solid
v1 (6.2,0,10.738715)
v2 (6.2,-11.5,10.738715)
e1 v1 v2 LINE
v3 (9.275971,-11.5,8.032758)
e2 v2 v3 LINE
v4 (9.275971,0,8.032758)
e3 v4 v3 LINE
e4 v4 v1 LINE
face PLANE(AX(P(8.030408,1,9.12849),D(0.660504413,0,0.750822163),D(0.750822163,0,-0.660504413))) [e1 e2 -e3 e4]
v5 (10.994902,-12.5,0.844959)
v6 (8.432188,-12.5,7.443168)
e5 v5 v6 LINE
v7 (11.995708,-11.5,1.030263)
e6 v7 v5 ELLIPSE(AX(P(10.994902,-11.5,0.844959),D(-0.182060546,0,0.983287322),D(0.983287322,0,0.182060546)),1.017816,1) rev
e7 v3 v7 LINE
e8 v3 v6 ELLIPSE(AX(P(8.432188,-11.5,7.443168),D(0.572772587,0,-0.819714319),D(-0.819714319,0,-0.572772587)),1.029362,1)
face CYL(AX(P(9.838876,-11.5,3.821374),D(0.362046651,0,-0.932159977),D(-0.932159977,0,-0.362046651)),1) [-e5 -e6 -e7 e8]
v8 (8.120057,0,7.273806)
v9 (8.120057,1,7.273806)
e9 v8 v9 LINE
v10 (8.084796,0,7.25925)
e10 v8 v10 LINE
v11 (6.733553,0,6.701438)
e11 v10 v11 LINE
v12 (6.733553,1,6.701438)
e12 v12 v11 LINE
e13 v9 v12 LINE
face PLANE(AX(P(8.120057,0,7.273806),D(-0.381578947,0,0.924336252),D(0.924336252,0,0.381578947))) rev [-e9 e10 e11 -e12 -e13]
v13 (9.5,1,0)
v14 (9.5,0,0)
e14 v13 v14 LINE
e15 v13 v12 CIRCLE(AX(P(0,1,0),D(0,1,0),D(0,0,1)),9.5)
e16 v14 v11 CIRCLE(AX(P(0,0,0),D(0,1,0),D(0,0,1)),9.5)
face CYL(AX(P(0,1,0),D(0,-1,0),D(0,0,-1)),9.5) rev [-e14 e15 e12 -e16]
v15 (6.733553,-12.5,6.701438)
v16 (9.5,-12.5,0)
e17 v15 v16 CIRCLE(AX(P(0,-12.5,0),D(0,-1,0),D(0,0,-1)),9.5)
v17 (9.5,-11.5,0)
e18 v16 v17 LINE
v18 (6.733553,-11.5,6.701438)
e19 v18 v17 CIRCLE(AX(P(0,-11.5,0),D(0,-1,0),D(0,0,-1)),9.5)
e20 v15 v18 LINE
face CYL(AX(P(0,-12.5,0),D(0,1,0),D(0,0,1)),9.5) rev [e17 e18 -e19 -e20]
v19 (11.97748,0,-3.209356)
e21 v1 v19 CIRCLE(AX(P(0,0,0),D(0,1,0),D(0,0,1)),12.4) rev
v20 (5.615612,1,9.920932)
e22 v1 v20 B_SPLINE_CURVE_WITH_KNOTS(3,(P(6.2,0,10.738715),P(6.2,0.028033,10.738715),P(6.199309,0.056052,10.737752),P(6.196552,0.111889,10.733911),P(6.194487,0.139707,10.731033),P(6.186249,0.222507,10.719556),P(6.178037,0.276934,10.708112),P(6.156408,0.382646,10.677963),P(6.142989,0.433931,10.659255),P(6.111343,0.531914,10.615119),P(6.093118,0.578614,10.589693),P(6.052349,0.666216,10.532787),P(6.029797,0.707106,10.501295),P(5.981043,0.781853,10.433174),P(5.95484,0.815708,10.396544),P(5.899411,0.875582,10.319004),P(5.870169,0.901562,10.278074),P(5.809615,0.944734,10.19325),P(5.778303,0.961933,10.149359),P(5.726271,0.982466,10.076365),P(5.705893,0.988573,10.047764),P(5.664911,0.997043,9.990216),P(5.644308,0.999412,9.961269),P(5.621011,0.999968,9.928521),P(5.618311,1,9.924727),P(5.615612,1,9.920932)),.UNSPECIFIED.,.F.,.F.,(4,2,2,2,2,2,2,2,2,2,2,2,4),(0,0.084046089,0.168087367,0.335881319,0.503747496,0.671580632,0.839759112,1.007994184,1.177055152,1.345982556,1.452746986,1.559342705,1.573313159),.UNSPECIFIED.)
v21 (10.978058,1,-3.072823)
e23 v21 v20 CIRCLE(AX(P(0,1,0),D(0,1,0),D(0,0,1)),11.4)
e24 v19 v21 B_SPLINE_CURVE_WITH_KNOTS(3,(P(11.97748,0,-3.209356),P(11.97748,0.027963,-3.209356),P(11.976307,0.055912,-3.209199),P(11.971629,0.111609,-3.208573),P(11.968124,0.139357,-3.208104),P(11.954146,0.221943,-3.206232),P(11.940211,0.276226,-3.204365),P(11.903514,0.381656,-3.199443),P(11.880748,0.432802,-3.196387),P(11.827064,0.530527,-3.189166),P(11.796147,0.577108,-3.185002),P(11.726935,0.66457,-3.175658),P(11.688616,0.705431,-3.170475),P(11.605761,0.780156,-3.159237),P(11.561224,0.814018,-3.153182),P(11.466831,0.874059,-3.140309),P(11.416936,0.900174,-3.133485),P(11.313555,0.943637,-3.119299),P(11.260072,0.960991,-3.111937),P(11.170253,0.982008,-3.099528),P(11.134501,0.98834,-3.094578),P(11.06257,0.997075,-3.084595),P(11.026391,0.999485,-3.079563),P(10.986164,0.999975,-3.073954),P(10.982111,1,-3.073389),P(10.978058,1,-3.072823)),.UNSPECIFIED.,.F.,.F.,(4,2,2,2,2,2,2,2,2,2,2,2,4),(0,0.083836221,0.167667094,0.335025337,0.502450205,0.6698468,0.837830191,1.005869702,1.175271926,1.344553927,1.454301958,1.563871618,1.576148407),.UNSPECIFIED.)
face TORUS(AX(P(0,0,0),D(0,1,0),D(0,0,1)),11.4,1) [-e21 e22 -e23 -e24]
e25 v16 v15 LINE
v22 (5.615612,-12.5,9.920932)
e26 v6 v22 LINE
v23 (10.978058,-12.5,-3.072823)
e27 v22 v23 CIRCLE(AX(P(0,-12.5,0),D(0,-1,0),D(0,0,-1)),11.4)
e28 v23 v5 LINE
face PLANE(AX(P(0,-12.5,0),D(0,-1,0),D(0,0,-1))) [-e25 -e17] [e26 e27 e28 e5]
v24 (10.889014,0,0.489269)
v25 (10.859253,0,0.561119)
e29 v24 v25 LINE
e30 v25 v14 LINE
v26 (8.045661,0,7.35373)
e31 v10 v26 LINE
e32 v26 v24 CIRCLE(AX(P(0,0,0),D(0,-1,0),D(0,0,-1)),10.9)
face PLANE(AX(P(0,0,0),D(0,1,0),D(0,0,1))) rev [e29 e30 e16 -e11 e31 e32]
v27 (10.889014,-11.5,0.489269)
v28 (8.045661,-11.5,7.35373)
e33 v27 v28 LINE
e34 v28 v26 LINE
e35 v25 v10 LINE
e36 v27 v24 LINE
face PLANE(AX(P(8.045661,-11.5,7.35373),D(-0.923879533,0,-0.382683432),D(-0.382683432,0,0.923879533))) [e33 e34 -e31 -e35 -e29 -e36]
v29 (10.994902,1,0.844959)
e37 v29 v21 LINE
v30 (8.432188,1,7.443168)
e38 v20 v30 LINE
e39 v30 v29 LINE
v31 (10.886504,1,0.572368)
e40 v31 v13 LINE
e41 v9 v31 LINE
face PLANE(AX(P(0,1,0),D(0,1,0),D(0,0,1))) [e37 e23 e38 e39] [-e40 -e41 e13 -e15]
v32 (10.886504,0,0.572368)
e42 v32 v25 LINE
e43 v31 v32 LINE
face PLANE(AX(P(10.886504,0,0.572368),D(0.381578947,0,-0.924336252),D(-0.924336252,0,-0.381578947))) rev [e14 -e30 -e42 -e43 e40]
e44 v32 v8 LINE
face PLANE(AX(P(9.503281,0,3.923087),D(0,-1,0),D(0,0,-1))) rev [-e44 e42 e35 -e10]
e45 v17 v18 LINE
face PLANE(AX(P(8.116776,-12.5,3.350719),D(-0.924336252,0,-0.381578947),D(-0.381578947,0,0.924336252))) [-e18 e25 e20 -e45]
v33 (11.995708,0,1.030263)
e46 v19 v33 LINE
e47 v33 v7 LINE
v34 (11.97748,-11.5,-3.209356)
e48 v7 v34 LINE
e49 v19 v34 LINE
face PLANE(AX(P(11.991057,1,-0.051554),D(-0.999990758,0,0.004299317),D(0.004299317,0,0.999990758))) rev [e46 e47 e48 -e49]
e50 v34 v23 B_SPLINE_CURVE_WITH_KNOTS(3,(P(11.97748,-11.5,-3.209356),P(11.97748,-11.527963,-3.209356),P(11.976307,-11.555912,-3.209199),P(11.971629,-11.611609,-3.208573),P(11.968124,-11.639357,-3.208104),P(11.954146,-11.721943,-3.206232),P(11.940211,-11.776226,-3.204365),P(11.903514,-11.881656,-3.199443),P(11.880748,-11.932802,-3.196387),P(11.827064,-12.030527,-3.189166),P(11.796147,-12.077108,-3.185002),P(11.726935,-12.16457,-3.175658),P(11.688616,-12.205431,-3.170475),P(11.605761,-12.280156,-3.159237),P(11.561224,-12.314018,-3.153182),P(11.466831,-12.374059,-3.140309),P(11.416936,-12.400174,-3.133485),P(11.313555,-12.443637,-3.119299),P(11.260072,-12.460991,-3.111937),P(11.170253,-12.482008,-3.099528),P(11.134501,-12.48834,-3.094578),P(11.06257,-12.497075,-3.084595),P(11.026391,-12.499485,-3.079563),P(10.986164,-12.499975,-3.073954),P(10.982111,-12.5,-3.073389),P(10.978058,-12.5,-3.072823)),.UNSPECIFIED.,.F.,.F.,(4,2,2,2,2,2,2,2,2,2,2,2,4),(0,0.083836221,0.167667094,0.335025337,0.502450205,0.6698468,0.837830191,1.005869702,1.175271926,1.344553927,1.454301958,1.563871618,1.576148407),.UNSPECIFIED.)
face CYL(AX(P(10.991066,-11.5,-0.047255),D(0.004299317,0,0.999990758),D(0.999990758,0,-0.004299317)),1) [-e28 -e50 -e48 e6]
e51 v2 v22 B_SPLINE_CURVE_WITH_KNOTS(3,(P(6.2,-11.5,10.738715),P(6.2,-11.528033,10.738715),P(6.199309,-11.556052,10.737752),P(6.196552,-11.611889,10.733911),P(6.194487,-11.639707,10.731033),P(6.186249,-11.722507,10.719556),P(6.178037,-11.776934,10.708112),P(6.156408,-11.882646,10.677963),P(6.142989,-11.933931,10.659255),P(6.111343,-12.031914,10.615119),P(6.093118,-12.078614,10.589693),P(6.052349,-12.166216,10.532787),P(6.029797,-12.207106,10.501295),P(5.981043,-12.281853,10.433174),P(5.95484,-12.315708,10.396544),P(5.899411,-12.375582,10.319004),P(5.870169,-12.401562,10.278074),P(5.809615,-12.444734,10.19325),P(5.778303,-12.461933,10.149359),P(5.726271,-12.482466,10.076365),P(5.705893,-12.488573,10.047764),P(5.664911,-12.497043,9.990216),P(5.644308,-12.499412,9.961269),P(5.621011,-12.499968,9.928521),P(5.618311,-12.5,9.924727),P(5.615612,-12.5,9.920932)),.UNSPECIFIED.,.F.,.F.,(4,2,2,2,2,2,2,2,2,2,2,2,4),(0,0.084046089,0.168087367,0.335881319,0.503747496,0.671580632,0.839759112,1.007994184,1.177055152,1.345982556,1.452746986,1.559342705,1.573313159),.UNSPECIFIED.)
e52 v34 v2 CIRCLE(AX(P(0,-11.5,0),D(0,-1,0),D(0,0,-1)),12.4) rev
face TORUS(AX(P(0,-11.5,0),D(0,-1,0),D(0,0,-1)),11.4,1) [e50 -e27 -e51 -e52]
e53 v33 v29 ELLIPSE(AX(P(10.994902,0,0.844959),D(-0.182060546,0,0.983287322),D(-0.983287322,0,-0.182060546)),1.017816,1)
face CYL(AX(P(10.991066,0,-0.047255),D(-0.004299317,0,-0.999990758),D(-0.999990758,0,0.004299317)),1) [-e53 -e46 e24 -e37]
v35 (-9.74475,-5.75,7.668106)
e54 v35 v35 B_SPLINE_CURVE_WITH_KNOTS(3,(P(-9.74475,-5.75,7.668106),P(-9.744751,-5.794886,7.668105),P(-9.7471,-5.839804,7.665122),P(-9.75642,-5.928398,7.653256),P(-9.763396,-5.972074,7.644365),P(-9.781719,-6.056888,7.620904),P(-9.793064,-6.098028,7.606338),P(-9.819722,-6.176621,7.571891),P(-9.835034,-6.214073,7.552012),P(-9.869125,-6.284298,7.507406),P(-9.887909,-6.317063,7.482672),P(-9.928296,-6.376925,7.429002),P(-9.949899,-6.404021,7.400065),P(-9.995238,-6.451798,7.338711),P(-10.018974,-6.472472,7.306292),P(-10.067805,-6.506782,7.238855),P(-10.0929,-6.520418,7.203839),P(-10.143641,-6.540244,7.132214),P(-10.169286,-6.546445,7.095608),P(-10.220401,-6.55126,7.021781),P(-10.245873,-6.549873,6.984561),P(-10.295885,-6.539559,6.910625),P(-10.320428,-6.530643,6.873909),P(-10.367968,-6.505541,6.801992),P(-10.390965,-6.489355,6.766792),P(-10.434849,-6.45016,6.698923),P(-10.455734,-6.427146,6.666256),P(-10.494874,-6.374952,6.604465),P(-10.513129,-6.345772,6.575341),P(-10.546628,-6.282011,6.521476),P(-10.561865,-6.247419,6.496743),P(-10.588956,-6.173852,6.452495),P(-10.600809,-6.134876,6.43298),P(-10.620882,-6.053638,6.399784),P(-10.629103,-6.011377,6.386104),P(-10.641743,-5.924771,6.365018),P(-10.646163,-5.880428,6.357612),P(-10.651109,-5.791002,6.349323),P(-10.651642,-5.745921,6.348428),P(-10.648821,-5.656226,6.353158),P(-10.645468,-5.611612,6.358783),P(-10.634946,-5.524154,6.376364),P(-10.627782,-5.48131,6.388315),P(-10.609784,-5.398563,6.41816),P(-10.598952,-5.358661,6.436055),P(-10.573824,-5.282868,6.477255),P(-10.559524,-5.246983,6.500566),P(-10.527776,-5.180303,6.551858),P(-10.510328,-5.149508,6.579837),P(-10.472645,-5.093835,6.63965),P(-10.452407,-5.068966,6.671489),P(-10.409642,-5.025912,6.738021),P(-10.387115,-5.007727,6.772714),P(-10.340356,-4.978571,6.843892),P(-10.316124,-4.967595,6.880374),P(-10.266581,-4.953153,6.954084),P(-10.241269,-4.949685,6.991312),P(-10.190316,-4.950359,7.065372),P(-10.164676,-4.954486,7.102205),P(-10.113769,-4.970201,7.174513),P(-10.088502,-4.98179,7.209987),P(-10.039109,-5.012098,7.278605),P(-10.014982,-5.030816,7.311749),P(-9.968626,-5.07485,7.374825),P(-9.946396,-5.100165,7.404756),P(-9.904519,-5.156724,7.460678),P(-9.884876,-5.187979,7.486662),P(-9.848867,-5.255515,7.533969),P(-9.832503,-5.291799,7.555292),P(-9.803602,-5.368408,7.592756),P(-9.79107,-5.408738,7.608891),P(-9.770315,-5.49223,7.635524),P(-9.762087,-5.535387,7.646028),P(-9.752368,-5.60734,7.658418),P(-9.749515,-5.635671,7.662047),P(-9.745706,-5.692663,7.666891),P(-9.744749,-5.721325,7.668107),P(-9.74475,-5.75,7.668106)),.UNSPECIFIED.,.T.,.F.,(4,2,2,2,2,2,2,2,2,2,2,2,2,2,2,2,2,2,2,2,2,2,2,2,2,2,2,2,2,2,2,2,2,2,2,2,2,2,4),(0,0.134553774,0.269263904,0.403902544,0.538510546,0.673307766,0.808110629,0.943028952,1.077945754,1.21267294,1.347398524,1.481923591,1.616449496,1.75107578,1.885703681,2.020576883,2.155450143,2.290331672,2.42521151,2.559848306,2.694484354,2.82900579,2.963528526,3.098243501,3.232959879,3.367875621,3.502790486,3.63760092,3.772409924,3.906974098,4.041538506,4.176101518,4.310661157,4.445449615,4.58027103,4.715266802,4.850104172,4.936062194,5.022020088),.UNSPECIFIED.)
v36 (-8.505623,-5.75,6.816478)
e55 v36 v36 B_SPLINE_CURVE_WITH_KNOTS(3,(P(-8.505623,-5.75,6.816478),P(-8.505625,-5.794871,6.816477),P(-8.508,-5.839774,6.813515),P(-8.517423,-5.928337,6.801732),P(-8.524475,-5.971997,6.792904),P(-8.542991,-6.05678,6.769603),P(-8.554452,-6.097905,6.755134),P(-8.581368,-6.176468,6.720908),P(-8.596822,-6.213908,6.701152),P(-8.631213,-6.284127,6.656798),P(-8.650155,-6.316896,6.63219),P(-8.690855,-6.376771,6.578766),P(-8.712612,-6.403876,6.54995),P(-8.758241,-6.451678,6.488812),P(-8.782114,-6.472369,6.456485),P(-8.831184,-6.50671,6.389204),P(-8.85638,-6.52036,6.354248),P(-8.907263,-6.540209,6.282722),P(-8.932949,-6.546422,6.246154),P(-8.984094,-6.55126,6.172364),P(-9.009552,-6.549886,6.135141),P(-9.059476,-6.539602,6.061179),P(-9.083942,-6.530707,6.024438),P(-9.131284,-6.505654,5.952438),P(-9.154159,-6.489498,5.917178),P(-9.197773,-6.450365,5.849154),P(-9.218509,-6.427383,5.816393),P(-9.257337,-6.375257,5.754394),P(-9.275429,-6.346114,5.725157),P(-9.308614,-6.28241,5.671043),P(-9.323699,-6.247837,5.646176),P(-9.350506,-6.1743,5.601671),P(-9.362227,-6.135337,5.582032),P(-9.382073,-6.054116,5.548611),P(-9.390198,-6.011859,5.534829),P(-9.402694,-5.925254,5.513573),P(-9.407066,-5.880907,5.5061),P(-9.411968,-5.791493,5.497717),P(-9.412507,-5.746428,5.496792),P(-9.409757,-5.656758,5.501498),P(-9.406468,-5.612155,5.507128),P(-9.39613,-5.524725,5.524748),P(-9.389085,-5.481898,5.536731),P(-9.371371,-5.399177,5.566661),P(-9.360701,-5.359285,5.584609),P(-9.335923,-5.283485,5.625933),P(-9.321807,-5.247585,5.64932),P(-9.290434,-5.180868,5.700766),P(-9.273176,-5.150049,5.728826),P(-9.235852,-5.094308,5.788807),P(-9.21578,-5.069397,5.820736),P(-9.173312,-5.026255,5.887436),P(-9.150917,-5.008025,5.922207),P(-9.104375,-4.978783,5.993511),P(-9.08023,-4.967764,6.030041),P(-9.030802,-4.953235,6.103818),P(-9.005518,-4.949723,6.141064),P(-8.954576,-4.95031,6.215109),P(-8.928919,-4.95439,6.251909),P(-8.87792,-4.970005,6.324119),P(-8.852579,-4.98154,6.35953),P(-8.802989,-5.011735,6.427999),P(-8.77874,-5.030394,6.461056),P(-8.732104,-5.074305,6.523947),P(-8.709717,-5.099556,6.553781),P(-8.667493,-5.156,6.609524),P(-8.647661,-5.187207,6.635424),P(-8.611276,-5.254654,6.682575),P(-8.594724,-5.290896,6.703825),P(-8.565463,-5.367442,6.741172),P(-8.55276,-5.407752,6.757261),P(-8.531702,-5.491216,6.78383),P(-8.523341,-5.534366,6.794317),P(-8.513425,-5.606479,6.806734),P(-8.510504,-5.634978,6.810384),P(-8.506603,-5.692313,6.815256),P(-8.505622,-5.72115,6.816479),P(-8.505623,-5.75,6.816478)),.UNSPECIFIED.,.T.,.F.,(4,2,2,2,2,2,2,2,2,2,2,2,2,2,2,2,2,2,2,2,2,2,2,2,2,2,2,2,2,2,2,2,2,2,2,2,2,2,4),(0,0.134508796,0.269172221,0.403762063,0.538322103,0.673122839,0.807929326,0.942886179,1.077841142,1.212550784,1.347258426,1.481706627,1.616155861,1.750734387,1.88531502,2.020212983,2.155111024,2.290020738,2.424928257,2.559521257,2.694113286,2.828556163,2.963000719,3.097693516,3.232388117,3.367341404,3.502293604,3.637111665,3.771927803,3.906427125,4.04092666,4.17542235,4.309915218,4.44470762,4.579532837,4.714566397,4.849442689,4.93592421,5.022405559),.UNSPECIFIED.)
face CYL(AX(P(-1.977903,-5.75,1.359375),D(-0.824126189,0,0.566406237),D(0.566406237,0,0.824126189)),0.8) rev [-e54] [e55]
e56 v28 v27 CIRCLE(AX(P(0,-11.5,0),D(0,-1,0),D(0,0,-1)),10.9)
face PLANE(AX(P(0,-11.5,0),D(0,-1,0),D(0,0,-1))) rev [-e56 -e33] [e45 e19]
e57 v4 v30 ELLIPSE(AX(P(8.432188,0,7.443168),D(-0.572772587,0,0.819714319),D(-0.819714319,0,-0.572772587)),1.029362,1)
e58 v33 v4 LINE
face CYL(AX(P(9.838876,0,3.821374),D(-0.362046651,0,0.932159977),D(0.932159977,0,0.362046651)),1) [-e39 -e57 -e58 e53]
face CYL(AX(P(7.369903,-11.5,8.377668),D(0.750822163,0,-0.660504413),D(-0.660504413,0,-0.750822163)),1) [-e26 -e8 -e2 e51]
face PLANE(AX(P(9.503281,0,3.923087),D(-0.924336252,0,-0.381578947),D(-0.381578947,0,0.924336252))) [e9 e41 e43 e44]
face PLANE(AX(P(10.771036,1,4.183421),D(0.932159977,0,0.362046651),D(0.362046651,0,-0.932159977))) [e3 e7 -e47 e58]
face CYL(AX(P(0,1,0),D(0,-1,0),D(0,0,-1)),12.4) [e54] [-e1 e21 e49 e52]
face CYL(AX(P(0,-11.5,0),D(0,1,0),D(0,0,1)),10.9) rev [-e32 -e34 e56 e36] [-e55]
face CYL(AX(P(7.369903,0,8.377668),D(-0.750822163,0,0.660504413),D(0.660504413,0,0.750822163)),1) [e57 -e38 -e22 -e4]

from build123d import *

# Parameters (mm, degrees)
EXTRUDE_1_DEPTH     = 1
EXTRUDE_START       = 11.5
EXTRUDE_3_DEPTH     = 11.5
EXTRUDE_START_2     = 1
EXTRUDE_4_DEPTH     = 1
FILLET_1_R          = 1
FILLET_2_R          = 1
SKETCH_7_W          = 7.249999999999998
SKETCH_7_H          = 1
CUT_EXTRUDE_1_DEPTH = 1.5
SKETCH1_R           = 0.8
CUT_EXTRUDE1_DEPTH  = 10


with BuildPart() as part:
    # 草图1 → 凸台-拉伸1 (new body)
    with BuildSketch(Plane(origin=(0, 0, 0), x_dir=(1, 0, 0), z_dir=(0, 1, 0))):
        with BuildLine():
            Line((11.995707880639234, -1.030263157894738), (9.275971038533973, -8.032758066524272))
            Line((9.275971038533973, -8.032758066524272), (6.200000000000001, -10.73871500692704))
            ThreePointArc((6.200000000000001, -10.73871500692704), (-11.456106203139957, 4.7452745613271095), (11.977480245984443, 3.2093561592712687))
            Line((11.977480245984443, 3.2093561592712687), (11.995707880639234, -1.030263157894738))
        make_face()
        with BuildLine():
            Line((9.5, 0), (6.733552631578949, -6.701437827642379))
            ThreePointArc((6.733552631578949, -6.701437827642379), (-8.78119439484174, 3.625), (9.5, 0))
        make_face(mode=Mode.SUBTRACT)
    extrude(amount=EXTRUDE_1_DEPTH)

    # 草图2 → 凸台-拉伸3 (add)
    with BuildSketch(Plane(origin=(0, 0, 0), x_dir=(-1, 0, 0), z_dir=(0, -1, 0)).offset(EXTRUDE_START)):
        with BuildLine():
            Line((-11.995707880639236, -1.0302631578947385), (-11.97748024598447, 3.2093561592711763))
            ThreePointArc((-11.97748024598447, 3.2093561592711763), (11.456106203139939, 4.745274561327148), (-6.2, -10.738715006927038))
            Line((-6.2, -10.738715006927038), (-9.275971038533974, -8.032758066524272))
            Line((-9.275971038533974, -8.032758066524272), (-11.995707880639236, -1.0302631578947385))
        make_face()
        with BuildLine():
            Line((-8.045661066301793, -7.353729530394456), (-10.889013517064273, -0.4892694811569148))
            ThreePointArc((-10.889013517064273, -0.4892694811569148), (10.070286904373022, 4.171249412779482), (-8.045661066301793, -7.353729530394456))
        make_face(mode=Mode.SUBTRACT)
    extrude(amount=-EXTRUDE_3_DEPTH)

    # 草图5 → 凸台-拉伸4 (add)
    with BuildSketch(Plane(origin=(0, -11.5, 0), x_dir=(-1, 0, 0), z_dir=(0, -1, 0)).offset(EXTRUDE_START_2)):
        with BuildLine():
            Line((-11.977480245984468, 3.2093561592711772), (-11.995707880639236, -1.0302631578947385))
            Line((-11.995707880639236, -1.0302631578947385), (-9.275971038533974, -8.032758066524272))
            Line((-9.275971038533974, -8.032758066524272), (-6.200000000000009, -10.738715006927029))
            ThreePointArc((-6.200000000000009, -10.738715006927029), (11.456106203139935, 4.745274561327147), (-11.977480245984468, 3.2093561592711772))
        make_face()
        with BuildLine():
            Line((-9.5, 0), (-6.733552631578949, -6.701437827642379))
            ThreePointArc((-6.733552631578949, -6.701437827642379), (8.78119439484174, 3.624999999999999), (-9.5, 0))
        make_face(mode=Mode.SUBTRACT)
    extrude(amount=-EXTRUDE_4_DEPTH)

    # 圆角1
    # the kernel refuses this fillet: 1 mm, written as the material it takes off along each edge
    with BuildSketch(Plane(origin=(11.1530264468926, -12.5, 6.38149703508447), x_dir=(-0.6605044125759205, 0, -0.75082216334345), z_dir=(-0.75082216334345, 0, 0.6605044125759205))) as fillet_1_piece_1:
        with BuildLine():
            CenterArc((FILLET_1_R, -FILLET_1_R), FILLET_1_R, 90, 90)
            Line((0, -FILLET_1_R), (0, 0))
            Line((0, 0), (FILLET_1_R, 0))
        make_face()
    extrude(amount=9.096803728910329, mode=Mode.SUBTRACT)
    with BuildSketch(Plane(origin=(3.36e-15, -12.5, -3.77e-15), x_dir=(0.663902971885599, 0, 0.7478187239709029), z_dir=(0.7478187239709029, 0, -0.663902971885599))) as fillet_1_piece_2:
        with BuildLine():
            CenterArc((12.399999999999997 - FILLET_1_R, -FILLET_1_R), FILLET_1_R, 0, 90)
            Line((12.399999999999997 - FILLET_1_R, 0), (12.399999999999997, 0))
            Line((12.399999999999997, 0), (12.399999999999999, -FILLET_1_R))
        make_face()
    revolve(axis=Axis((3.36e-15, -12.5, -3.77e-15), (0, -1, 0)), revolution_arc=308.1964386657649, mode=Mode.SUBTRACT)
    with BuildSketch(Plane(origin=(11.966731954198387, -12.5, -5.709333054009145), x_dir=(0, 1, 0), z_dir=(0.0042993167144171895, 0, 0.9999907578951863))) as fillet_1_piece_3:
        with BuildLine():
            CenterArc((FILLET_1_R, FILLET_1_R), FILLET_1_R, 180, 90)
            Line((0, FILLET_1_R), (0, 0))
            Line((0, 0), (FILLET_1_R, 0))
        make_face()
    extrude(amount=9.239658500534155, mode=Mode.SUBTRACT)
    with BuildSketch(Plane(origin=(12.900824508619046, -12.5, -1.3001367841226104), x_dir=(7e-17, 1, 3e-17), z_dir=(-0.36204665119192375, 0, 0.9321599768069393))) as fillet_1_piece_4:
        with BuildLine():
            CenterArc((FILLET_1_R, FILLET_1_R), FILLET_1_R, 180, 90)
            Line((-8e-17, FILLET_1_R), (0, 0))
            Line((0, 0), (FILLET_1_R, 0))
        make_face()
    extrude(amount=12.512117107426324, mode=Mode.SUBTRACT)

    # 圆角2
    # the kernel refuses this fillet: 1 mm, written as the material it takes off along each edge
    with BuildSketch(Plane(origin=(11.966731954198387, 1, -5.709333054009236), x_dir=(0, -1, 0), z_dir=(0.004299316714422545, 0, 0.9999907578951863))) as fillet_2_piece_1:
        with BuildLine():
            CenterArc((FILLET_2_R, -FILLET_2_R), FILLET_2_R, 90, 90)
            Line((0, -FILLET_2_R), (0, 0))
            Line((0, 0), (FILLET_2_R, 0))
        make_face()
    extrude(amount=9.239658500534247, mode=Mode.SUBTRACT)
    with BuildSketch(Plane(origin=(6e-17, 1, 1.33e-15), x_dir=(0.6639029718855987, 0, 0.7478187239709033), z_dir=(0.7478187239709033, 0, -0.6639029718855987))) as fillet_2_piece_2:
        with BuildLine():
            CenterArc((12.4 - FILLET_2_R, FILLET_2_R), FILLET_2_R, 270, 90)
            Line((12.4 - FILLET_2_R, 0), (12.4, 0))
            Line((12.4, 0), (12.400000000000002, FILLET_2_R))
        make_face()
    revolve(axis=Axis((6e-17, 1, 1.33e-15), (0, -1, 0)), revolution_arc=308.19643866576433, mode=Mode.SUBTRACT)
    with BuildSketch(Plane(origin=(11.153026446892596, 1, 6.381497035084468), x_dir=(-0.6605044125759212, 0, -0.7508221633434493), z_dir=(-0.7508221633434494, 0, 0.6605044125759213))) as fillet_2_piece_3:
        with BuildLine():
            CenterArc((FILLET_2_R, FILLET_2_R), FILLET_2_R, 180, 90)
            Line((0, FILLET_2_R), (0, 0))
            Line((0, 0), (FILLET_2_R, 0))
        make_face()
    extrude(amount=9.096803728910343, mode=Mode.SUBTRACT)
    with BuildSketch(Plane(origin=(12.900824508619046, 1, -1.3001367841226104), x_dir=(-0.9321599768069392, 0, -0.3620466511919237), z_dir=(-0.36204665119192375, 0, 0.9321599768069393))) as fillet_2_piece_4:
        with BuildLine():
            CenterArc((FILLET_2_R, FILLET_2_R), FILLET_2_R, 180, 90)
            Line((8e-17, FILLET_2_R), (0, 0))
            Line((0, 0), (FILLET_2_R, 0))
        make_face()
    extrude(amount=12.512117107426329, mode=Mode.SUBTRACT)

    # 草图7 → 切除-拉伸1 (cut)
    with BuildSketch(Plane(origin=(8.116776315789474, 0, 3.3507189138211895), x_dir=(-0.3815789473684208, 0, 0.9243362520886044), z_dir=(-0.9243362520886044, 0, -0.3815789473684208))):
        with Locations((0, 0.5)):
            Rectangle(SKETCH_7_W, SKETCH_7_H)
    extrude(amount=-CUT_EXTRUDE_1_DEPTH, mode=Mode.SUBTRACT)

    # Sketch1 → Cut-Extrude1 (cut)
    with BuildSketch(Plane(origin=(-10.219164738912983, -5.75, 7.023437337867946), x_dir=(0.5664062369248344, 0, 0.8241261886220147), z_dir=(-0.8241261886220146, 0, 0.5664062369248343))):
        Circle(SKETCH1_R)
    extrude(amount=-CUT_EXTRUDE1_DEPTH, mode=Mode.SUBTRACT)


solid = part.part
